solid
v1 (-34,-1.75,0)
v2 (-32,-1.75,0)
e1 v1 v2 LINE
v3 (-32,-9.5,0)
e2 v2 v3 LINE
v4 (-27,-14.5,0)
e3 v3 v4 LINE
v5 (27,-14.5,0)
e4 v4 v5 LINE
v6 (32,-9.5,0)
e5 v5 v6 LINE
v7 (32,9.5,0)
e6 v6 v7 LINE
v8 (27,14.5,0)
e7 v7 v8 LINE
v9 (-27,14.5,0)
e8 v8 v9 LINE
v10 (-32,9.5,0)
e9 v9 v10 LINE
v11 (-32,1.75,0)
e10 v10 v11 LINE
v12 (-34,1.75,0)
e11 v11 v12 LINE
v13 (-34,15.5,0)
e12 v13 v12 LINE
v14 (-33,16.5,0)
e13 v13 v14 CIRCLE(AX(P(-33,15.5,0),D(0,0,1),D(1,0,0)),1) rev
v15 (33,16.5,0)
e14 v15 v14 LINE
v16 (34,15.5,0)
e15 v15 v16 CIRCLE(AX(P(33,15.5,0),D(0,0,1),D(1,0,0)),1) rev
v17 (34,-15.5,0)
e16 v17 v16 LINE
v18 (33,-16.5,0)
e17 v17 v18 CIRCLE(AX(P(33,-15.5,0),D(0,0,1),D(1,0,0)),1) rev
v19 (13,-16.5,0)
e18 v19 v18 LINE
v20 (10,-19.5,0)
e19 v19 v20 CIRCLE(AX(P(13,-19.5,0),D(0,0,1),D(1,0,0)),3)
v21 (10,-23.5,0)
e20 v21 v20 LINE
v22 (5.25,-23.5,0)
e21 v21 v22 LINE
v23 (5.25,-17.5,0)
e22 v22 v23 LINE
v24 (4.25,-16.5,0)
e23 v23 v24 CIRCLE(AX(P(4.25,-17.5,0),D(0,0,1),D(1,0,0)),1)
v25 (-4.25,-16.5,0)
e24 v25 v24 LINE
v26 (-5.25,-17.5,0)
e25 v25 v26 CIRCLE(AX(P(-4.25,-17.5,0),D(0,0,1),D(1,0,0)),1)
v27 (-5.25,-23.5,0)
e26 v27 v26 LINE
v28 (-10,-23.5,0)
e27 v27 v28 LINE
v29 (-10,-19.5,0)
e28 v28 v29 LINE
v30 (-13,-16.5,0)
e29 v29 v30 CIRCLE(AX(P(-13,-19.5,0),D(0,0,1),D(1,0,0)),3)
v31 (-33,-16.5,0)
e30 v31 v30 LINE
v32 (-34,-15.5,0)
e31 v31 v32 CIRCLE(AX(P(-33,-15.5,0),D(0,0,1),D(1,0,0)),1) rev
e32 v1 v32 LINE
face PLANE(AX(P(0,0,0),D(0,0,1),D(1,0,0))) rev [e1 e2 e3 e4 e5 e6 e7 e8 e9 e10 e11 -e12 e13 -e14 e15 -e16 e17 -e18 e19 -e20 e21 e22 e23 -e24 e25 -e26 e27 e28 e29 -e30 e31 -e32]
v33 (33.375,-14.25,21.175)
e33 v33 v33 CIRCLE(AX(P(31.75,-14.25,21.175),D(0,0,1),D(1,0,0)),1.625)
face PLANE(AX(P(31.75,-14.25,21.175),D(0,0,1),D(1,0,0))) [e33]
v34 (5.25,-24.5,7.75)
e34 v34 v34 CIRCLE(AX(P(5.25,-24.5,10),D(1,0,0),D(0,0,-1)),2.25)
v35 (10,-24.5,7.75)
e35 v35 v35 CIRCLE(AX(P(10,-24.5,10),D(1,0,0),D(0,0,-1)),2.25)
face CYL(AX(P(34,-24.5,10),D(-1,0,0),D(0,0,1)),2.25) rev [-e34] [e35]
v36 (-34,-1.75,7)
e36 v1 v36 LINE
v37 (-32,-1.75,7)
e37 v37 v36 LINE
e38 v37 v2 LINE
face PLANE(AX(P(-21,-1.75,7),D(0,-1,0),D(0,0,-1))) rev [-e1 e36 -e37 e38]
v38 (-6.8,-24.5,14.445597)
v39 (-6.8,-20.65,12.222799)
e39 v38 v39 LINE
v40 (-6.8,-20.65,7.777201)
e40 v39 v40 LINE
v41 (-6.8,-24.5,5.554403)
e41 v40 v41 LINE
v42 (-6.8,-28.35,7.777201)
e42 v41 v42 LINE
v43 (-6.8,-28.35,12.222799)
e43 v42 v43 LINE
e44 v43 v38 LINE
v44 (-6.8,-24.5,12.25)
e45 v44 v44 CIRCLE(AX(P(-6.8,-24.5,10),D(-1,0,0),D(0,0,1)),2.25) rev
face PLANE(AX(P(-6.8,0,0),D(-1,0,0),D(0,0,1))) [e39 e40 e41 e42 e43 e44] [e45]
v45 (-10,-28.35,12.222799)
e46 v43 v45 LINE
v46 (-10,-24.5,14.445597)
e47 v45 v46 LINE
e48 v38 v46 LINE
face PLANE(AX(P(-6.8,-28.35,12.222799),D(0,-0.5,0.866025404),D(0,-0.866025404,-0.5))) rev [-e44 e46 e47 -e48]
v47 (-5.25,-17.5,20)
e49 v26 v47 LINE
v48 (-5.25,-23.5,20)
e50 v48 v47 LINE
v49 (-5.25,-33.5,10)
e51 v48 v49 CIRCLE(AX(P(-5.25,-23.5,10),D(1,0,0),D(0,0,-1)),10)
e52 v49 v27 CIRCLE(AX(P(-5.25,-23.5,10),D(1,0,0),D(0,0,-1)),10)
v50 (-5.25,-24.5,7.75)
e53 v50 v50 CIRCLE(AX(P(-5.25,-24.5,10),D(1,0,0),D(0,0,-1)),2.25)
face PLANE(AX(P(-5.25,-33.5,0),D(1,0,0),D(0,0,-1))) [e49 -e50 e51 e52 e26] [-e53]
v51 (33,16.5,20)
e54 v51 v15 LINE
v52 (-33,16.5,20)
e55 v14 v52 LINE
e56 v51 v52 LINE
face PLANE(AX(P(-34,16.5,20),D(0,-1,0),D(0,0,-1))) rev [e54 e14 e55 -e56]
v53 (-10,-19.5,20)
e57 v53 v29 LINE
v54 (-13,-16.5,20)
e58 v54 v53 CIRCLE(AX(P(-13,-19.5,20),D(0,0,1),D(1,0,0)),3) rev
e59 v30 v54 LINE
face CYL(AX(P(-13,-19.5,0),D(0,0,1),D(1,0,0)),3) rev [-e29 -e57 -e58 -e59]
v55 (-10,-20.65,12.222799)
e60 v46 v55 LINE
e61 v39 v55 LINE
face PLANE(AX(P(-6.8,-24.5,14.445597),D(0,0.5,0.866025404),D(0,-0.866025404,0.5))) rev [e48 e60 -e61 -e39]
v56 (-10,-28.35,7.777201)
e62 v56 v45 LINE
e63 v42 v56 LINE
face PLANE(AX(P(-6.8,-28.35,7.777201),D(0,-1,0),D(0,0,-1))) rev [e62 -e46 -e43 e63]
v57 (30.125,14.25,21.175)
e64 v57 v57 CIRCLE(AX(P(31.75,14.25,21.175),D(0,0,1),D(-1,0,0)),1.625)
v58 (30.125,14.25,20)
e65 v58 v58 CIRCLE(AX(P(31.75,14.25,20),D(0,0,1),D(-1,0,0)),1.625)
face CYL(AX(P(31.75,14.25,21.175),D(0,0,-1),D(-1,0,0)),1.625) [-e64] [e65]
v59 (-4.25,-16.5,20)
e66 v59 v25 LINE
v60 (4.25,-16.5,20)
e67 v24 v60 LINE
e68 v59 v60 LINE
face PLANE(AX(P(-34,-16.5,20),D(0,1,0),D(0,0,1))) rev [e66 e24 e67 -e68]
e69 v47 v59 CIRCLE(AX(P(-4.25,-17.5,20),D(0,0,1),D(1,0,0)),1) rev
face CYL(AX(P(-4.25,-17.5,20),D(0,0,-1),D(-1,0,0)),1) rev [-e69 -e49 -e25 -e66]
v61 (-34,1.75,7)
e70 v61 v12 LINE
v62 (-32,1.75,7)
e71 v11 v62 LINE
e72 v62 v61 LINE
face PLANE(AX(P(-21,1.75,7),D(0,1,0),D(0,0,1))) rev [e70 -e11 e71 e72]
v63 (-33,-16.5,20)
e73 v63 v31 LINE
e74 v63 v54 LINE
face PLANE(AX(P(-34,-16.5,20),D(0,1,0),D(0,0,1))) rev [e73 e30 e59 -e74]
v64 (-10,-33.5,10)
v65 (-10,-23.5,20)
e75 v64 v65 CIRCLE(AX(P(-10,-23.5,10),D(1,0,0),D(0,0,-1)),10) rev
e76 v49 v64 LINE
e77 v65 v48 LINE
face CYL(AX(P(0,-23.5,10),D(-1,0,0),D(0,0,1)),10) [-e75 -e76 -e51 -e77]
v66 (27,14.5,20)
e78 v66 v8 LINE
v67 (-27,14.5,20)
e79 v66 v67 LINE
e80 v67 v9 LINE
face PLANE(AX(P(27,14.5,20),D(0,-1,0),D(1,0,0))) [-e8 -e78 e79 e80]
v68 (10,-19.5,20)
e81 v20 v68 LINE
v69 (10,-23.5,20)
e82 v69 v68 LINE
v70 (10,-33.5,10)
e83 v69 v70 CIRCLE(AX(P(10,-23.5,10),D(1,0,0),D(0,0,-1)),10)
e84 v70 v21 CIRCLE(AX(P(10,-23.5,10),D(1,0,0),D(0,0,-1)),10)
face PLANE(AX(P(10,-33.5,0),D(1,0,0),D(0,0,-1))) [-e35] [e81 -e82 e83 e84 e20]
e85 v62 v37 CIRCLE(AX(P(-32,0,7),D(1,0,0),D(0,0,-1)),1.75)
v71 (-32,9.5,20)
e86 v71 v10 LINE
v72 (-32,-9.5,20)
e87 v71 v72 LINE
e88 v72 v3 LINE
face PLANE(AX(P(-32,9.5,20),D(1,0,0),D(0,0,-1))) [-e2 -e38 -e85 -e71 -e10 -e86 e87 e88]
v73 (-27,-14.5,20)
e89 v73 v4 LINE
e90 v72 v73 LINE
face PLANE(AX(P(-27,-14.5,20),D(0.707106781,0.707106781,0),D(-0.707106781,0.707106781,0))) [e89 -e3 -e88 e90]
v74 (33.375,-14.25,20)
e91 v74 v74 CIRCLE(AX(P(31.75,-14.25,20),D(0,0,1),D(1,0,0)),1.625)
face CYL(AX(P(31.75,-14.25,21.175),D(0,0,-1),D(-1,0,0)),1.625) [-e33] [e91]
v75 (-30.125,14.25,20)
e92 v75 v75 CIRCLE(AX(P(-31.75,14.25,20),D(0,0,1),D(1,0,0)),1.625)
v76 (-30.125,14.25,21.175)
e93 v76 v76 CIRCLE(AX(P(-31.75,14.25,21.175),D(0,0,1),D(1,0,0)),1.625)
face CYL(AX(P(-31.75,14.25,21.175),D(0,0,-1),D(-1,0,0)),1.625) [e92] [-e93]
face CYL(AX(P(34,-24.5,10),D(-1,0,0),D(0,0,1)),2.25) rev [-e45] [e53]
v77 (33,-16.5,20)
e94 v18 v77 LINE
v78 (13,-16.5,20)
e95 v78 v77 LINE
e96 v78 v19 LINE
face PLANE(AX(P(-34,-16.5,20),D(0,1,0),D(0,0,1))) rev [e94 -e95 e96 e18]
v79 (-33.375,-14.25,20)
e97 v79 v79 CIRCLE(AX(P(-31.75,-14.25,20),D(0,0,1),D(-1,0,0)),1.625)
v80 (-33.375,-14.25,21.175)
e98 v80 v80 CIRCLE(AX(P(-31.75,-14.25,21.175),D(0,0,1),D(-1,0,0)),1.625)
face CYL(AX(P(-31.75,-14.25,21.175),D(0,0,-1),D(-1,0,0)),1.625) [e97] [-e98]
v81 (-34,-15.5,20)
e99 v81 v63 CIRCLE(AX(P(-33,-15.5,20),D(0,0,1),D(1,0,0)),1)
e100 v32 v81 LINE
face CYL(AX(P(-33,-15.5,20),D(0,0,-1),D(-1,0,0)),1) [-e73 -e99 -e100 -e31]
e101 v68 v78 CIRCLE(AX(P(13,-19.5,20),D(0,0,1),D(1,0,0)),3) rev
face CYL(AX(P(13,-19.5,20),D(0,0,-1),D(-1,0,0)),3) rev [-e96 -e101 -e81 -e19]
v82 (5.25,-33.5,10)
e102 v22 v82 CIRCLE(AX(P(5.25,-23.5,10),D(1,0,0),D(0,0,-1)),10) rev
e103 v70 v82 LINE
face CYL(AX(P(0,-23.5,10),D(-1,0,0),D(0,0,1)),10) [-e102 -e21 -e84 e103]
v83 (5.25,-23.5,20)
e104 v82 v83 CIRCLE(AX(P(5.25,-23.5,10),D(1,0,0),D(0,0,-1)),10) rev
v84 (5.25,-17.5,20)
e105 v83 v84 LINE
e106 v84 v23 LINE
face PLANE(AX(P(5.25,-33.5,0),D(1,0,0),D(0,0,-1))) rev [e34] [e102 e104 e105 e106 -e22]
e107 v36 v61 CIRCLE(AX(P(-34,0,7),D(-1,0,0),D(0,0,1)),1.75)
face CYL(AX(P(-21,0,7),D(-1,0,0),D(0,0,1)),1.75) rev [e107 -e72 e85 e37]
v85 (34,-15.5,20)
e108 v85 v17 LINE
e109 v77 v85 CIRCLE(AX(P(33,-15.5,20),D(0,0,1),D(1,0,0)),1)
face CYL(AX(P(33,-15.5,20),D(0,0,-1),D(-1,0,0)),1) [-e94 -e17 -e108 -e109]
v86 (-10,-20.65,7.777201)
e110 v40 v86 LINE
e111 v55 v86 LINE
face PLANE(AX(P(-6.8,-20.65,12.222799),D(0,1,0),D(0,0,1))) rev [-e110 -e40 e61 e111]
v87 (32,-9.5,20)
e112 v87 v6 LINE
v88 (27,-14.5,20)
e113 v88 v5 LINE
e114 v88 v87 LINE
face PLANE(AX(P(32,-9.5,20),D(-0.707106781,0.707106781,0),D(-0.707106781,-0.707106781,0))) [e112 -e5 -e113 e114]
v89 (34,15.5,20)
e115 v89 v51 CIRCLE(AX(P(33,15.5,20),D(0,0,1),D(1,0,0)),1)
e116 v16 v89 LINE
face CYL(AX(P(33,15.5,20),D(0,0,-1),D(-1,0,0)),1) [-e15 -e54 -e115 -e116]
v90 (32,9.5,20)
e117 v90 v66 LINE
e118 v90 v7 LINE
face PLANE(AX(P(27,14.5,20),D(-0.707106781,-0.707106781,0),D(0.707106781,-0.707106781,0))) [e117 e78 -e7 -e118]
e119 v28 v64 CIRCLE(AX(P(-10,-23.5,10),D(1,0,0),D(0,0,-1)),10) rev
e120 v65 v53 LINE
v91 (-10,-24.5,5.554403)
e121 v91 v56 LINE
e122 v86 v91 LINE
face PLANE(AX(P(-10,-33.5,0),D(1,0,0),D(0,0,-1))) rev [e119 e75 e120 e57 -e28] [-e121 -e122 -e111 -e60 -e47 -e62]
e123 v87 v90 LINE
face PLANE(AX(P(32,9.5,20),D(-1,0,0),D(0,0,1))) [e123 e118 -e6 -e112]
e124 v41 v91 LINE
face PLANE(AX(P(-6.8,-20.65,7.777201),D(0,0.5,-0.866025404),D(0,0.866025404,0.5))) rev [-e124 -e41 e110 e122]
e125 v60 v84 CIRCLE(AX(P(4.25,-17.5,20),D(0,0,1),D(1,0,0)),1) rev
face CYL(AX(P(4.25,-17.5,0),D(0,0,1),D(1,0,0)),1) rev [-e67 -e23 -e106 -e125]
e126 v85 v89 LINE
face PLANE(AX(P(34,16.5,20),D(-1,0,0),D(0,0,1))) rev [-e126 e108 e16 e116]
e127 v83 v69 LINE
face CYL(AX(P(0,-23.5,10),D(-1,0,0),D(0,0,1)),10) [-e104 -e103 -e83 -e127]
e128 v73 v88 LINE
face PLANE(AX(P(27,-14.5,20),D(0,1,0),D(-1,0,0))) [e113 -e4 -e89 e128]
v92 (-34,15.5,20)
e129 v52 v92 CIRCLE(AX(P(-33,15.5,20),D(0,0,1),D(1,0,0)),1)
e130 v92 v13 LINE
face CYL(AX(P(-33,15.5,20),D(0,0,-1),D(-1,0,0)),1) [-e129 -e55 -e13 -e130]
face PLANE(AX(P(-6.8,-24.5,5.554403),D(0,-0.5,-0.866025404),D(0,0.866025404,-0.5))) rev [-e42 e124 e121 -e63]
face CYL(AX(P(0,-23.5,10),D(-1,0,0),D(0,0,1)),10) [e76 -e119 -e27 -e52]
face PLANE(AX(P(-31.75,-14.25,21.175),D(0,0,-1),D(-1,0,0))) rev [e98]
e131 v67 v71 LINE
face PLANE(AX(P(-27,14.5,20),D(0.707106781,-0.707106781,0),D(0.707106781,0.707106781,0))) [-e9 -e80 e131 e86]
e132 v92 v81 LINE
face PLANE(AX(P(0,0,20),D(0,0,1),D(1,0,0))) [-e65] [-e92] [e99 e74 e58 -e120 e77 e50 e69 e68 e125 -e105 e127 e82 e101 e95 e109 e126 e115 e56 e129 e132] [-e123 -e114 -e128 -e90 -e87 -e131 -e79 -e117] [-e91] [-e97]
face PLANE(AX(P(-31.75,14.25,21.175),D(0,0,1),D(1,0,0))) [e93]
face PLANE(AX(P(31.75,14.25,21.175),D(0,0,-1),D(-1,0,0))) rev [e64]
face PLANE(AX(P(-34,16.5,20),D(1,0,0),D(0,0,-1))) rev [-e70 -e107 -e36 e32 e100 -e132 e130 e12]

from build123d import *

# Parameters (mm, degrees)
SKETCH1_W           = 68
SKETCH1_H           = 33
BOSS_EXTRUDE1_DEPTH = 20
SKETCH2_R           = 1.625
BOSS_EXTRUDE2_DEPTH = 1.175
FILLET1_R           = 1
CUT_EXTRUDE1_DEPTH  = 13
SKETCH5_W           = 4.75
SKETCH5_H           = 20
BOSS_EXTRUDE3_DEPTH = 17
SKETCH7_R           = 2.25
CUT_EXTRUDE2_DEPTH  = 60.216810324
CUT_EXTRUDE3_DEPTH  = 3.2
FILLET2_R           = 10
FILLET4_R           = 3
FILLET5_R           = 1


with BuildPart() as part:
    # Sketch1 → Boss-Extrude1 (new body)
    with BuildSketch(Plane.XY):
        Rectangle(SKETCH1_W, SKETCH1_H)
        Polygon((-27, 14.5), (-32, 9.5), (-32, -9.5), (-27, -14.5), (27, -14.5), (32, -9.5), (32, 9.5), (27, 14.5), align=None, mode=Mode.SUBTRACT)
    extrude(amount=BOSS_EXTRUDE1_DEPTH)

    # Sketch2 → Boss-Extrude2 (add)
    with BuildSketch(Plane.XY.offset(20)):
        with Locations((31.75, -14.25)):
            Circle(SKETCH2_R)
        with Locations(Location((31.75, 14.25, 0), (0, 0, 180))):
            Circle(SKETCH2_R)
        with Locations((-31.75, 14.25)):
            Circle(SKETCH2_R)
        with Locations(Location((-31.75, -14.25, 0), (0, 0, 180))):
            Circle(SKETCH2_R)
    extrude(amount=BOSS_EXTRUDE2_DEPTH)

    # Fillet1
    fillet1_edges = [part.edges().sort_by_distance(p)[0] for p in [
        (34, -16.5, 10),
        (-34, -16.5, 10),
        (-34, 16.5, 10),
        (34, 16.5, 10),
    ]]
    fillet(fillet1_edges, radius=FILLET1_R)

    # Sketch3 → Cut-Extrude1 (cut)
    with BuildSketch(Plane.ZY.offset(34)):
        with BuildLine():
            Line((7, -1.75), (-7, -1.75))
            ThreePointArc((-7, -1.75), (-8.75, 0), (-7, 1.75))
            Line((-7, 1.75), (7, 1.75))
            ThreePointArc((7, 1.75), (8.75, 0), (7, -1.75))
        make_face()
    extrude(amount=-CUT_EXTRUDE1_DEPTH, mode=Mode.SUBTRACT)

    # Sketch5 → Boss-Extrude3 (add)
    with BuildSketch(Plane.XZ.offset(16.5)):
        with Locations((7.625, 10)):
            Rectangle(SKETCH5_W, SKETCH5_H)
        with Locations((-7.625, 10)):
            Rectangle(SKETCH5_W, SKETCH5_H)
    extrude(amount=BOSS_EXTRUDE3_DEPTH)

    # Sketch7 → Cut-Extrude2 (cut, through all)
    with BuildSketch(Plane.ZY.offset(10)):
        with Locations((10, -24.5)):
            Circle(SKETCH7_R)
    extrude(amount=-CUT_EXTRUDE2_DEPTH, mode=Mode.SUBTRACT)

    # Sketch8 → Cut-Extrude3 (cut)
    with BuildSketch(Plane.ZY.offset(10)):
        Polygon((5.554402927, -24.5), (7.777201464, -28.35), (12.222798536, -28.35), (14.445597073, -24.5), (12.222798536, -20.65), (7.777201464, -20.65), align=None)
    extrude(amount=-CUT_EXTRUDE3_DEPTH, mode=Mode.SUBTRACT)

    # Fillet2
    fillet2_edges = [part.edges().sort_by_distance(p)[0] for p in [
        (7.625, -33.5, 0),
        (7.625, -33.5, 20),
        (-7.625, -33.5, 0),
        (-7.625, -33.5, 20),
    ]]
    fillet(fillet2_edges, radius=FILLET2_R - 0.0001)  # a hair under: the kernel refuses the full size

    # Fillet4
    fillet4_edges = [part.edges().sort_by_distance(p)[0] for p in [
        (10, -16.5, 10),
        (-10, -16.5, 10),
    ]]
    fillet(fillet4_edges, radius=FILLET4_R)

    # Fillet5
    fillet5_edges = [part.edges().sort_by_distance(p)[0] for p in [
        (5.25, -16.5, 10),
        (-5.25, -16.5, 10),
    ]]
    fillet(fillet5_edges, radius=FILLET5_R)


solid = part.part
